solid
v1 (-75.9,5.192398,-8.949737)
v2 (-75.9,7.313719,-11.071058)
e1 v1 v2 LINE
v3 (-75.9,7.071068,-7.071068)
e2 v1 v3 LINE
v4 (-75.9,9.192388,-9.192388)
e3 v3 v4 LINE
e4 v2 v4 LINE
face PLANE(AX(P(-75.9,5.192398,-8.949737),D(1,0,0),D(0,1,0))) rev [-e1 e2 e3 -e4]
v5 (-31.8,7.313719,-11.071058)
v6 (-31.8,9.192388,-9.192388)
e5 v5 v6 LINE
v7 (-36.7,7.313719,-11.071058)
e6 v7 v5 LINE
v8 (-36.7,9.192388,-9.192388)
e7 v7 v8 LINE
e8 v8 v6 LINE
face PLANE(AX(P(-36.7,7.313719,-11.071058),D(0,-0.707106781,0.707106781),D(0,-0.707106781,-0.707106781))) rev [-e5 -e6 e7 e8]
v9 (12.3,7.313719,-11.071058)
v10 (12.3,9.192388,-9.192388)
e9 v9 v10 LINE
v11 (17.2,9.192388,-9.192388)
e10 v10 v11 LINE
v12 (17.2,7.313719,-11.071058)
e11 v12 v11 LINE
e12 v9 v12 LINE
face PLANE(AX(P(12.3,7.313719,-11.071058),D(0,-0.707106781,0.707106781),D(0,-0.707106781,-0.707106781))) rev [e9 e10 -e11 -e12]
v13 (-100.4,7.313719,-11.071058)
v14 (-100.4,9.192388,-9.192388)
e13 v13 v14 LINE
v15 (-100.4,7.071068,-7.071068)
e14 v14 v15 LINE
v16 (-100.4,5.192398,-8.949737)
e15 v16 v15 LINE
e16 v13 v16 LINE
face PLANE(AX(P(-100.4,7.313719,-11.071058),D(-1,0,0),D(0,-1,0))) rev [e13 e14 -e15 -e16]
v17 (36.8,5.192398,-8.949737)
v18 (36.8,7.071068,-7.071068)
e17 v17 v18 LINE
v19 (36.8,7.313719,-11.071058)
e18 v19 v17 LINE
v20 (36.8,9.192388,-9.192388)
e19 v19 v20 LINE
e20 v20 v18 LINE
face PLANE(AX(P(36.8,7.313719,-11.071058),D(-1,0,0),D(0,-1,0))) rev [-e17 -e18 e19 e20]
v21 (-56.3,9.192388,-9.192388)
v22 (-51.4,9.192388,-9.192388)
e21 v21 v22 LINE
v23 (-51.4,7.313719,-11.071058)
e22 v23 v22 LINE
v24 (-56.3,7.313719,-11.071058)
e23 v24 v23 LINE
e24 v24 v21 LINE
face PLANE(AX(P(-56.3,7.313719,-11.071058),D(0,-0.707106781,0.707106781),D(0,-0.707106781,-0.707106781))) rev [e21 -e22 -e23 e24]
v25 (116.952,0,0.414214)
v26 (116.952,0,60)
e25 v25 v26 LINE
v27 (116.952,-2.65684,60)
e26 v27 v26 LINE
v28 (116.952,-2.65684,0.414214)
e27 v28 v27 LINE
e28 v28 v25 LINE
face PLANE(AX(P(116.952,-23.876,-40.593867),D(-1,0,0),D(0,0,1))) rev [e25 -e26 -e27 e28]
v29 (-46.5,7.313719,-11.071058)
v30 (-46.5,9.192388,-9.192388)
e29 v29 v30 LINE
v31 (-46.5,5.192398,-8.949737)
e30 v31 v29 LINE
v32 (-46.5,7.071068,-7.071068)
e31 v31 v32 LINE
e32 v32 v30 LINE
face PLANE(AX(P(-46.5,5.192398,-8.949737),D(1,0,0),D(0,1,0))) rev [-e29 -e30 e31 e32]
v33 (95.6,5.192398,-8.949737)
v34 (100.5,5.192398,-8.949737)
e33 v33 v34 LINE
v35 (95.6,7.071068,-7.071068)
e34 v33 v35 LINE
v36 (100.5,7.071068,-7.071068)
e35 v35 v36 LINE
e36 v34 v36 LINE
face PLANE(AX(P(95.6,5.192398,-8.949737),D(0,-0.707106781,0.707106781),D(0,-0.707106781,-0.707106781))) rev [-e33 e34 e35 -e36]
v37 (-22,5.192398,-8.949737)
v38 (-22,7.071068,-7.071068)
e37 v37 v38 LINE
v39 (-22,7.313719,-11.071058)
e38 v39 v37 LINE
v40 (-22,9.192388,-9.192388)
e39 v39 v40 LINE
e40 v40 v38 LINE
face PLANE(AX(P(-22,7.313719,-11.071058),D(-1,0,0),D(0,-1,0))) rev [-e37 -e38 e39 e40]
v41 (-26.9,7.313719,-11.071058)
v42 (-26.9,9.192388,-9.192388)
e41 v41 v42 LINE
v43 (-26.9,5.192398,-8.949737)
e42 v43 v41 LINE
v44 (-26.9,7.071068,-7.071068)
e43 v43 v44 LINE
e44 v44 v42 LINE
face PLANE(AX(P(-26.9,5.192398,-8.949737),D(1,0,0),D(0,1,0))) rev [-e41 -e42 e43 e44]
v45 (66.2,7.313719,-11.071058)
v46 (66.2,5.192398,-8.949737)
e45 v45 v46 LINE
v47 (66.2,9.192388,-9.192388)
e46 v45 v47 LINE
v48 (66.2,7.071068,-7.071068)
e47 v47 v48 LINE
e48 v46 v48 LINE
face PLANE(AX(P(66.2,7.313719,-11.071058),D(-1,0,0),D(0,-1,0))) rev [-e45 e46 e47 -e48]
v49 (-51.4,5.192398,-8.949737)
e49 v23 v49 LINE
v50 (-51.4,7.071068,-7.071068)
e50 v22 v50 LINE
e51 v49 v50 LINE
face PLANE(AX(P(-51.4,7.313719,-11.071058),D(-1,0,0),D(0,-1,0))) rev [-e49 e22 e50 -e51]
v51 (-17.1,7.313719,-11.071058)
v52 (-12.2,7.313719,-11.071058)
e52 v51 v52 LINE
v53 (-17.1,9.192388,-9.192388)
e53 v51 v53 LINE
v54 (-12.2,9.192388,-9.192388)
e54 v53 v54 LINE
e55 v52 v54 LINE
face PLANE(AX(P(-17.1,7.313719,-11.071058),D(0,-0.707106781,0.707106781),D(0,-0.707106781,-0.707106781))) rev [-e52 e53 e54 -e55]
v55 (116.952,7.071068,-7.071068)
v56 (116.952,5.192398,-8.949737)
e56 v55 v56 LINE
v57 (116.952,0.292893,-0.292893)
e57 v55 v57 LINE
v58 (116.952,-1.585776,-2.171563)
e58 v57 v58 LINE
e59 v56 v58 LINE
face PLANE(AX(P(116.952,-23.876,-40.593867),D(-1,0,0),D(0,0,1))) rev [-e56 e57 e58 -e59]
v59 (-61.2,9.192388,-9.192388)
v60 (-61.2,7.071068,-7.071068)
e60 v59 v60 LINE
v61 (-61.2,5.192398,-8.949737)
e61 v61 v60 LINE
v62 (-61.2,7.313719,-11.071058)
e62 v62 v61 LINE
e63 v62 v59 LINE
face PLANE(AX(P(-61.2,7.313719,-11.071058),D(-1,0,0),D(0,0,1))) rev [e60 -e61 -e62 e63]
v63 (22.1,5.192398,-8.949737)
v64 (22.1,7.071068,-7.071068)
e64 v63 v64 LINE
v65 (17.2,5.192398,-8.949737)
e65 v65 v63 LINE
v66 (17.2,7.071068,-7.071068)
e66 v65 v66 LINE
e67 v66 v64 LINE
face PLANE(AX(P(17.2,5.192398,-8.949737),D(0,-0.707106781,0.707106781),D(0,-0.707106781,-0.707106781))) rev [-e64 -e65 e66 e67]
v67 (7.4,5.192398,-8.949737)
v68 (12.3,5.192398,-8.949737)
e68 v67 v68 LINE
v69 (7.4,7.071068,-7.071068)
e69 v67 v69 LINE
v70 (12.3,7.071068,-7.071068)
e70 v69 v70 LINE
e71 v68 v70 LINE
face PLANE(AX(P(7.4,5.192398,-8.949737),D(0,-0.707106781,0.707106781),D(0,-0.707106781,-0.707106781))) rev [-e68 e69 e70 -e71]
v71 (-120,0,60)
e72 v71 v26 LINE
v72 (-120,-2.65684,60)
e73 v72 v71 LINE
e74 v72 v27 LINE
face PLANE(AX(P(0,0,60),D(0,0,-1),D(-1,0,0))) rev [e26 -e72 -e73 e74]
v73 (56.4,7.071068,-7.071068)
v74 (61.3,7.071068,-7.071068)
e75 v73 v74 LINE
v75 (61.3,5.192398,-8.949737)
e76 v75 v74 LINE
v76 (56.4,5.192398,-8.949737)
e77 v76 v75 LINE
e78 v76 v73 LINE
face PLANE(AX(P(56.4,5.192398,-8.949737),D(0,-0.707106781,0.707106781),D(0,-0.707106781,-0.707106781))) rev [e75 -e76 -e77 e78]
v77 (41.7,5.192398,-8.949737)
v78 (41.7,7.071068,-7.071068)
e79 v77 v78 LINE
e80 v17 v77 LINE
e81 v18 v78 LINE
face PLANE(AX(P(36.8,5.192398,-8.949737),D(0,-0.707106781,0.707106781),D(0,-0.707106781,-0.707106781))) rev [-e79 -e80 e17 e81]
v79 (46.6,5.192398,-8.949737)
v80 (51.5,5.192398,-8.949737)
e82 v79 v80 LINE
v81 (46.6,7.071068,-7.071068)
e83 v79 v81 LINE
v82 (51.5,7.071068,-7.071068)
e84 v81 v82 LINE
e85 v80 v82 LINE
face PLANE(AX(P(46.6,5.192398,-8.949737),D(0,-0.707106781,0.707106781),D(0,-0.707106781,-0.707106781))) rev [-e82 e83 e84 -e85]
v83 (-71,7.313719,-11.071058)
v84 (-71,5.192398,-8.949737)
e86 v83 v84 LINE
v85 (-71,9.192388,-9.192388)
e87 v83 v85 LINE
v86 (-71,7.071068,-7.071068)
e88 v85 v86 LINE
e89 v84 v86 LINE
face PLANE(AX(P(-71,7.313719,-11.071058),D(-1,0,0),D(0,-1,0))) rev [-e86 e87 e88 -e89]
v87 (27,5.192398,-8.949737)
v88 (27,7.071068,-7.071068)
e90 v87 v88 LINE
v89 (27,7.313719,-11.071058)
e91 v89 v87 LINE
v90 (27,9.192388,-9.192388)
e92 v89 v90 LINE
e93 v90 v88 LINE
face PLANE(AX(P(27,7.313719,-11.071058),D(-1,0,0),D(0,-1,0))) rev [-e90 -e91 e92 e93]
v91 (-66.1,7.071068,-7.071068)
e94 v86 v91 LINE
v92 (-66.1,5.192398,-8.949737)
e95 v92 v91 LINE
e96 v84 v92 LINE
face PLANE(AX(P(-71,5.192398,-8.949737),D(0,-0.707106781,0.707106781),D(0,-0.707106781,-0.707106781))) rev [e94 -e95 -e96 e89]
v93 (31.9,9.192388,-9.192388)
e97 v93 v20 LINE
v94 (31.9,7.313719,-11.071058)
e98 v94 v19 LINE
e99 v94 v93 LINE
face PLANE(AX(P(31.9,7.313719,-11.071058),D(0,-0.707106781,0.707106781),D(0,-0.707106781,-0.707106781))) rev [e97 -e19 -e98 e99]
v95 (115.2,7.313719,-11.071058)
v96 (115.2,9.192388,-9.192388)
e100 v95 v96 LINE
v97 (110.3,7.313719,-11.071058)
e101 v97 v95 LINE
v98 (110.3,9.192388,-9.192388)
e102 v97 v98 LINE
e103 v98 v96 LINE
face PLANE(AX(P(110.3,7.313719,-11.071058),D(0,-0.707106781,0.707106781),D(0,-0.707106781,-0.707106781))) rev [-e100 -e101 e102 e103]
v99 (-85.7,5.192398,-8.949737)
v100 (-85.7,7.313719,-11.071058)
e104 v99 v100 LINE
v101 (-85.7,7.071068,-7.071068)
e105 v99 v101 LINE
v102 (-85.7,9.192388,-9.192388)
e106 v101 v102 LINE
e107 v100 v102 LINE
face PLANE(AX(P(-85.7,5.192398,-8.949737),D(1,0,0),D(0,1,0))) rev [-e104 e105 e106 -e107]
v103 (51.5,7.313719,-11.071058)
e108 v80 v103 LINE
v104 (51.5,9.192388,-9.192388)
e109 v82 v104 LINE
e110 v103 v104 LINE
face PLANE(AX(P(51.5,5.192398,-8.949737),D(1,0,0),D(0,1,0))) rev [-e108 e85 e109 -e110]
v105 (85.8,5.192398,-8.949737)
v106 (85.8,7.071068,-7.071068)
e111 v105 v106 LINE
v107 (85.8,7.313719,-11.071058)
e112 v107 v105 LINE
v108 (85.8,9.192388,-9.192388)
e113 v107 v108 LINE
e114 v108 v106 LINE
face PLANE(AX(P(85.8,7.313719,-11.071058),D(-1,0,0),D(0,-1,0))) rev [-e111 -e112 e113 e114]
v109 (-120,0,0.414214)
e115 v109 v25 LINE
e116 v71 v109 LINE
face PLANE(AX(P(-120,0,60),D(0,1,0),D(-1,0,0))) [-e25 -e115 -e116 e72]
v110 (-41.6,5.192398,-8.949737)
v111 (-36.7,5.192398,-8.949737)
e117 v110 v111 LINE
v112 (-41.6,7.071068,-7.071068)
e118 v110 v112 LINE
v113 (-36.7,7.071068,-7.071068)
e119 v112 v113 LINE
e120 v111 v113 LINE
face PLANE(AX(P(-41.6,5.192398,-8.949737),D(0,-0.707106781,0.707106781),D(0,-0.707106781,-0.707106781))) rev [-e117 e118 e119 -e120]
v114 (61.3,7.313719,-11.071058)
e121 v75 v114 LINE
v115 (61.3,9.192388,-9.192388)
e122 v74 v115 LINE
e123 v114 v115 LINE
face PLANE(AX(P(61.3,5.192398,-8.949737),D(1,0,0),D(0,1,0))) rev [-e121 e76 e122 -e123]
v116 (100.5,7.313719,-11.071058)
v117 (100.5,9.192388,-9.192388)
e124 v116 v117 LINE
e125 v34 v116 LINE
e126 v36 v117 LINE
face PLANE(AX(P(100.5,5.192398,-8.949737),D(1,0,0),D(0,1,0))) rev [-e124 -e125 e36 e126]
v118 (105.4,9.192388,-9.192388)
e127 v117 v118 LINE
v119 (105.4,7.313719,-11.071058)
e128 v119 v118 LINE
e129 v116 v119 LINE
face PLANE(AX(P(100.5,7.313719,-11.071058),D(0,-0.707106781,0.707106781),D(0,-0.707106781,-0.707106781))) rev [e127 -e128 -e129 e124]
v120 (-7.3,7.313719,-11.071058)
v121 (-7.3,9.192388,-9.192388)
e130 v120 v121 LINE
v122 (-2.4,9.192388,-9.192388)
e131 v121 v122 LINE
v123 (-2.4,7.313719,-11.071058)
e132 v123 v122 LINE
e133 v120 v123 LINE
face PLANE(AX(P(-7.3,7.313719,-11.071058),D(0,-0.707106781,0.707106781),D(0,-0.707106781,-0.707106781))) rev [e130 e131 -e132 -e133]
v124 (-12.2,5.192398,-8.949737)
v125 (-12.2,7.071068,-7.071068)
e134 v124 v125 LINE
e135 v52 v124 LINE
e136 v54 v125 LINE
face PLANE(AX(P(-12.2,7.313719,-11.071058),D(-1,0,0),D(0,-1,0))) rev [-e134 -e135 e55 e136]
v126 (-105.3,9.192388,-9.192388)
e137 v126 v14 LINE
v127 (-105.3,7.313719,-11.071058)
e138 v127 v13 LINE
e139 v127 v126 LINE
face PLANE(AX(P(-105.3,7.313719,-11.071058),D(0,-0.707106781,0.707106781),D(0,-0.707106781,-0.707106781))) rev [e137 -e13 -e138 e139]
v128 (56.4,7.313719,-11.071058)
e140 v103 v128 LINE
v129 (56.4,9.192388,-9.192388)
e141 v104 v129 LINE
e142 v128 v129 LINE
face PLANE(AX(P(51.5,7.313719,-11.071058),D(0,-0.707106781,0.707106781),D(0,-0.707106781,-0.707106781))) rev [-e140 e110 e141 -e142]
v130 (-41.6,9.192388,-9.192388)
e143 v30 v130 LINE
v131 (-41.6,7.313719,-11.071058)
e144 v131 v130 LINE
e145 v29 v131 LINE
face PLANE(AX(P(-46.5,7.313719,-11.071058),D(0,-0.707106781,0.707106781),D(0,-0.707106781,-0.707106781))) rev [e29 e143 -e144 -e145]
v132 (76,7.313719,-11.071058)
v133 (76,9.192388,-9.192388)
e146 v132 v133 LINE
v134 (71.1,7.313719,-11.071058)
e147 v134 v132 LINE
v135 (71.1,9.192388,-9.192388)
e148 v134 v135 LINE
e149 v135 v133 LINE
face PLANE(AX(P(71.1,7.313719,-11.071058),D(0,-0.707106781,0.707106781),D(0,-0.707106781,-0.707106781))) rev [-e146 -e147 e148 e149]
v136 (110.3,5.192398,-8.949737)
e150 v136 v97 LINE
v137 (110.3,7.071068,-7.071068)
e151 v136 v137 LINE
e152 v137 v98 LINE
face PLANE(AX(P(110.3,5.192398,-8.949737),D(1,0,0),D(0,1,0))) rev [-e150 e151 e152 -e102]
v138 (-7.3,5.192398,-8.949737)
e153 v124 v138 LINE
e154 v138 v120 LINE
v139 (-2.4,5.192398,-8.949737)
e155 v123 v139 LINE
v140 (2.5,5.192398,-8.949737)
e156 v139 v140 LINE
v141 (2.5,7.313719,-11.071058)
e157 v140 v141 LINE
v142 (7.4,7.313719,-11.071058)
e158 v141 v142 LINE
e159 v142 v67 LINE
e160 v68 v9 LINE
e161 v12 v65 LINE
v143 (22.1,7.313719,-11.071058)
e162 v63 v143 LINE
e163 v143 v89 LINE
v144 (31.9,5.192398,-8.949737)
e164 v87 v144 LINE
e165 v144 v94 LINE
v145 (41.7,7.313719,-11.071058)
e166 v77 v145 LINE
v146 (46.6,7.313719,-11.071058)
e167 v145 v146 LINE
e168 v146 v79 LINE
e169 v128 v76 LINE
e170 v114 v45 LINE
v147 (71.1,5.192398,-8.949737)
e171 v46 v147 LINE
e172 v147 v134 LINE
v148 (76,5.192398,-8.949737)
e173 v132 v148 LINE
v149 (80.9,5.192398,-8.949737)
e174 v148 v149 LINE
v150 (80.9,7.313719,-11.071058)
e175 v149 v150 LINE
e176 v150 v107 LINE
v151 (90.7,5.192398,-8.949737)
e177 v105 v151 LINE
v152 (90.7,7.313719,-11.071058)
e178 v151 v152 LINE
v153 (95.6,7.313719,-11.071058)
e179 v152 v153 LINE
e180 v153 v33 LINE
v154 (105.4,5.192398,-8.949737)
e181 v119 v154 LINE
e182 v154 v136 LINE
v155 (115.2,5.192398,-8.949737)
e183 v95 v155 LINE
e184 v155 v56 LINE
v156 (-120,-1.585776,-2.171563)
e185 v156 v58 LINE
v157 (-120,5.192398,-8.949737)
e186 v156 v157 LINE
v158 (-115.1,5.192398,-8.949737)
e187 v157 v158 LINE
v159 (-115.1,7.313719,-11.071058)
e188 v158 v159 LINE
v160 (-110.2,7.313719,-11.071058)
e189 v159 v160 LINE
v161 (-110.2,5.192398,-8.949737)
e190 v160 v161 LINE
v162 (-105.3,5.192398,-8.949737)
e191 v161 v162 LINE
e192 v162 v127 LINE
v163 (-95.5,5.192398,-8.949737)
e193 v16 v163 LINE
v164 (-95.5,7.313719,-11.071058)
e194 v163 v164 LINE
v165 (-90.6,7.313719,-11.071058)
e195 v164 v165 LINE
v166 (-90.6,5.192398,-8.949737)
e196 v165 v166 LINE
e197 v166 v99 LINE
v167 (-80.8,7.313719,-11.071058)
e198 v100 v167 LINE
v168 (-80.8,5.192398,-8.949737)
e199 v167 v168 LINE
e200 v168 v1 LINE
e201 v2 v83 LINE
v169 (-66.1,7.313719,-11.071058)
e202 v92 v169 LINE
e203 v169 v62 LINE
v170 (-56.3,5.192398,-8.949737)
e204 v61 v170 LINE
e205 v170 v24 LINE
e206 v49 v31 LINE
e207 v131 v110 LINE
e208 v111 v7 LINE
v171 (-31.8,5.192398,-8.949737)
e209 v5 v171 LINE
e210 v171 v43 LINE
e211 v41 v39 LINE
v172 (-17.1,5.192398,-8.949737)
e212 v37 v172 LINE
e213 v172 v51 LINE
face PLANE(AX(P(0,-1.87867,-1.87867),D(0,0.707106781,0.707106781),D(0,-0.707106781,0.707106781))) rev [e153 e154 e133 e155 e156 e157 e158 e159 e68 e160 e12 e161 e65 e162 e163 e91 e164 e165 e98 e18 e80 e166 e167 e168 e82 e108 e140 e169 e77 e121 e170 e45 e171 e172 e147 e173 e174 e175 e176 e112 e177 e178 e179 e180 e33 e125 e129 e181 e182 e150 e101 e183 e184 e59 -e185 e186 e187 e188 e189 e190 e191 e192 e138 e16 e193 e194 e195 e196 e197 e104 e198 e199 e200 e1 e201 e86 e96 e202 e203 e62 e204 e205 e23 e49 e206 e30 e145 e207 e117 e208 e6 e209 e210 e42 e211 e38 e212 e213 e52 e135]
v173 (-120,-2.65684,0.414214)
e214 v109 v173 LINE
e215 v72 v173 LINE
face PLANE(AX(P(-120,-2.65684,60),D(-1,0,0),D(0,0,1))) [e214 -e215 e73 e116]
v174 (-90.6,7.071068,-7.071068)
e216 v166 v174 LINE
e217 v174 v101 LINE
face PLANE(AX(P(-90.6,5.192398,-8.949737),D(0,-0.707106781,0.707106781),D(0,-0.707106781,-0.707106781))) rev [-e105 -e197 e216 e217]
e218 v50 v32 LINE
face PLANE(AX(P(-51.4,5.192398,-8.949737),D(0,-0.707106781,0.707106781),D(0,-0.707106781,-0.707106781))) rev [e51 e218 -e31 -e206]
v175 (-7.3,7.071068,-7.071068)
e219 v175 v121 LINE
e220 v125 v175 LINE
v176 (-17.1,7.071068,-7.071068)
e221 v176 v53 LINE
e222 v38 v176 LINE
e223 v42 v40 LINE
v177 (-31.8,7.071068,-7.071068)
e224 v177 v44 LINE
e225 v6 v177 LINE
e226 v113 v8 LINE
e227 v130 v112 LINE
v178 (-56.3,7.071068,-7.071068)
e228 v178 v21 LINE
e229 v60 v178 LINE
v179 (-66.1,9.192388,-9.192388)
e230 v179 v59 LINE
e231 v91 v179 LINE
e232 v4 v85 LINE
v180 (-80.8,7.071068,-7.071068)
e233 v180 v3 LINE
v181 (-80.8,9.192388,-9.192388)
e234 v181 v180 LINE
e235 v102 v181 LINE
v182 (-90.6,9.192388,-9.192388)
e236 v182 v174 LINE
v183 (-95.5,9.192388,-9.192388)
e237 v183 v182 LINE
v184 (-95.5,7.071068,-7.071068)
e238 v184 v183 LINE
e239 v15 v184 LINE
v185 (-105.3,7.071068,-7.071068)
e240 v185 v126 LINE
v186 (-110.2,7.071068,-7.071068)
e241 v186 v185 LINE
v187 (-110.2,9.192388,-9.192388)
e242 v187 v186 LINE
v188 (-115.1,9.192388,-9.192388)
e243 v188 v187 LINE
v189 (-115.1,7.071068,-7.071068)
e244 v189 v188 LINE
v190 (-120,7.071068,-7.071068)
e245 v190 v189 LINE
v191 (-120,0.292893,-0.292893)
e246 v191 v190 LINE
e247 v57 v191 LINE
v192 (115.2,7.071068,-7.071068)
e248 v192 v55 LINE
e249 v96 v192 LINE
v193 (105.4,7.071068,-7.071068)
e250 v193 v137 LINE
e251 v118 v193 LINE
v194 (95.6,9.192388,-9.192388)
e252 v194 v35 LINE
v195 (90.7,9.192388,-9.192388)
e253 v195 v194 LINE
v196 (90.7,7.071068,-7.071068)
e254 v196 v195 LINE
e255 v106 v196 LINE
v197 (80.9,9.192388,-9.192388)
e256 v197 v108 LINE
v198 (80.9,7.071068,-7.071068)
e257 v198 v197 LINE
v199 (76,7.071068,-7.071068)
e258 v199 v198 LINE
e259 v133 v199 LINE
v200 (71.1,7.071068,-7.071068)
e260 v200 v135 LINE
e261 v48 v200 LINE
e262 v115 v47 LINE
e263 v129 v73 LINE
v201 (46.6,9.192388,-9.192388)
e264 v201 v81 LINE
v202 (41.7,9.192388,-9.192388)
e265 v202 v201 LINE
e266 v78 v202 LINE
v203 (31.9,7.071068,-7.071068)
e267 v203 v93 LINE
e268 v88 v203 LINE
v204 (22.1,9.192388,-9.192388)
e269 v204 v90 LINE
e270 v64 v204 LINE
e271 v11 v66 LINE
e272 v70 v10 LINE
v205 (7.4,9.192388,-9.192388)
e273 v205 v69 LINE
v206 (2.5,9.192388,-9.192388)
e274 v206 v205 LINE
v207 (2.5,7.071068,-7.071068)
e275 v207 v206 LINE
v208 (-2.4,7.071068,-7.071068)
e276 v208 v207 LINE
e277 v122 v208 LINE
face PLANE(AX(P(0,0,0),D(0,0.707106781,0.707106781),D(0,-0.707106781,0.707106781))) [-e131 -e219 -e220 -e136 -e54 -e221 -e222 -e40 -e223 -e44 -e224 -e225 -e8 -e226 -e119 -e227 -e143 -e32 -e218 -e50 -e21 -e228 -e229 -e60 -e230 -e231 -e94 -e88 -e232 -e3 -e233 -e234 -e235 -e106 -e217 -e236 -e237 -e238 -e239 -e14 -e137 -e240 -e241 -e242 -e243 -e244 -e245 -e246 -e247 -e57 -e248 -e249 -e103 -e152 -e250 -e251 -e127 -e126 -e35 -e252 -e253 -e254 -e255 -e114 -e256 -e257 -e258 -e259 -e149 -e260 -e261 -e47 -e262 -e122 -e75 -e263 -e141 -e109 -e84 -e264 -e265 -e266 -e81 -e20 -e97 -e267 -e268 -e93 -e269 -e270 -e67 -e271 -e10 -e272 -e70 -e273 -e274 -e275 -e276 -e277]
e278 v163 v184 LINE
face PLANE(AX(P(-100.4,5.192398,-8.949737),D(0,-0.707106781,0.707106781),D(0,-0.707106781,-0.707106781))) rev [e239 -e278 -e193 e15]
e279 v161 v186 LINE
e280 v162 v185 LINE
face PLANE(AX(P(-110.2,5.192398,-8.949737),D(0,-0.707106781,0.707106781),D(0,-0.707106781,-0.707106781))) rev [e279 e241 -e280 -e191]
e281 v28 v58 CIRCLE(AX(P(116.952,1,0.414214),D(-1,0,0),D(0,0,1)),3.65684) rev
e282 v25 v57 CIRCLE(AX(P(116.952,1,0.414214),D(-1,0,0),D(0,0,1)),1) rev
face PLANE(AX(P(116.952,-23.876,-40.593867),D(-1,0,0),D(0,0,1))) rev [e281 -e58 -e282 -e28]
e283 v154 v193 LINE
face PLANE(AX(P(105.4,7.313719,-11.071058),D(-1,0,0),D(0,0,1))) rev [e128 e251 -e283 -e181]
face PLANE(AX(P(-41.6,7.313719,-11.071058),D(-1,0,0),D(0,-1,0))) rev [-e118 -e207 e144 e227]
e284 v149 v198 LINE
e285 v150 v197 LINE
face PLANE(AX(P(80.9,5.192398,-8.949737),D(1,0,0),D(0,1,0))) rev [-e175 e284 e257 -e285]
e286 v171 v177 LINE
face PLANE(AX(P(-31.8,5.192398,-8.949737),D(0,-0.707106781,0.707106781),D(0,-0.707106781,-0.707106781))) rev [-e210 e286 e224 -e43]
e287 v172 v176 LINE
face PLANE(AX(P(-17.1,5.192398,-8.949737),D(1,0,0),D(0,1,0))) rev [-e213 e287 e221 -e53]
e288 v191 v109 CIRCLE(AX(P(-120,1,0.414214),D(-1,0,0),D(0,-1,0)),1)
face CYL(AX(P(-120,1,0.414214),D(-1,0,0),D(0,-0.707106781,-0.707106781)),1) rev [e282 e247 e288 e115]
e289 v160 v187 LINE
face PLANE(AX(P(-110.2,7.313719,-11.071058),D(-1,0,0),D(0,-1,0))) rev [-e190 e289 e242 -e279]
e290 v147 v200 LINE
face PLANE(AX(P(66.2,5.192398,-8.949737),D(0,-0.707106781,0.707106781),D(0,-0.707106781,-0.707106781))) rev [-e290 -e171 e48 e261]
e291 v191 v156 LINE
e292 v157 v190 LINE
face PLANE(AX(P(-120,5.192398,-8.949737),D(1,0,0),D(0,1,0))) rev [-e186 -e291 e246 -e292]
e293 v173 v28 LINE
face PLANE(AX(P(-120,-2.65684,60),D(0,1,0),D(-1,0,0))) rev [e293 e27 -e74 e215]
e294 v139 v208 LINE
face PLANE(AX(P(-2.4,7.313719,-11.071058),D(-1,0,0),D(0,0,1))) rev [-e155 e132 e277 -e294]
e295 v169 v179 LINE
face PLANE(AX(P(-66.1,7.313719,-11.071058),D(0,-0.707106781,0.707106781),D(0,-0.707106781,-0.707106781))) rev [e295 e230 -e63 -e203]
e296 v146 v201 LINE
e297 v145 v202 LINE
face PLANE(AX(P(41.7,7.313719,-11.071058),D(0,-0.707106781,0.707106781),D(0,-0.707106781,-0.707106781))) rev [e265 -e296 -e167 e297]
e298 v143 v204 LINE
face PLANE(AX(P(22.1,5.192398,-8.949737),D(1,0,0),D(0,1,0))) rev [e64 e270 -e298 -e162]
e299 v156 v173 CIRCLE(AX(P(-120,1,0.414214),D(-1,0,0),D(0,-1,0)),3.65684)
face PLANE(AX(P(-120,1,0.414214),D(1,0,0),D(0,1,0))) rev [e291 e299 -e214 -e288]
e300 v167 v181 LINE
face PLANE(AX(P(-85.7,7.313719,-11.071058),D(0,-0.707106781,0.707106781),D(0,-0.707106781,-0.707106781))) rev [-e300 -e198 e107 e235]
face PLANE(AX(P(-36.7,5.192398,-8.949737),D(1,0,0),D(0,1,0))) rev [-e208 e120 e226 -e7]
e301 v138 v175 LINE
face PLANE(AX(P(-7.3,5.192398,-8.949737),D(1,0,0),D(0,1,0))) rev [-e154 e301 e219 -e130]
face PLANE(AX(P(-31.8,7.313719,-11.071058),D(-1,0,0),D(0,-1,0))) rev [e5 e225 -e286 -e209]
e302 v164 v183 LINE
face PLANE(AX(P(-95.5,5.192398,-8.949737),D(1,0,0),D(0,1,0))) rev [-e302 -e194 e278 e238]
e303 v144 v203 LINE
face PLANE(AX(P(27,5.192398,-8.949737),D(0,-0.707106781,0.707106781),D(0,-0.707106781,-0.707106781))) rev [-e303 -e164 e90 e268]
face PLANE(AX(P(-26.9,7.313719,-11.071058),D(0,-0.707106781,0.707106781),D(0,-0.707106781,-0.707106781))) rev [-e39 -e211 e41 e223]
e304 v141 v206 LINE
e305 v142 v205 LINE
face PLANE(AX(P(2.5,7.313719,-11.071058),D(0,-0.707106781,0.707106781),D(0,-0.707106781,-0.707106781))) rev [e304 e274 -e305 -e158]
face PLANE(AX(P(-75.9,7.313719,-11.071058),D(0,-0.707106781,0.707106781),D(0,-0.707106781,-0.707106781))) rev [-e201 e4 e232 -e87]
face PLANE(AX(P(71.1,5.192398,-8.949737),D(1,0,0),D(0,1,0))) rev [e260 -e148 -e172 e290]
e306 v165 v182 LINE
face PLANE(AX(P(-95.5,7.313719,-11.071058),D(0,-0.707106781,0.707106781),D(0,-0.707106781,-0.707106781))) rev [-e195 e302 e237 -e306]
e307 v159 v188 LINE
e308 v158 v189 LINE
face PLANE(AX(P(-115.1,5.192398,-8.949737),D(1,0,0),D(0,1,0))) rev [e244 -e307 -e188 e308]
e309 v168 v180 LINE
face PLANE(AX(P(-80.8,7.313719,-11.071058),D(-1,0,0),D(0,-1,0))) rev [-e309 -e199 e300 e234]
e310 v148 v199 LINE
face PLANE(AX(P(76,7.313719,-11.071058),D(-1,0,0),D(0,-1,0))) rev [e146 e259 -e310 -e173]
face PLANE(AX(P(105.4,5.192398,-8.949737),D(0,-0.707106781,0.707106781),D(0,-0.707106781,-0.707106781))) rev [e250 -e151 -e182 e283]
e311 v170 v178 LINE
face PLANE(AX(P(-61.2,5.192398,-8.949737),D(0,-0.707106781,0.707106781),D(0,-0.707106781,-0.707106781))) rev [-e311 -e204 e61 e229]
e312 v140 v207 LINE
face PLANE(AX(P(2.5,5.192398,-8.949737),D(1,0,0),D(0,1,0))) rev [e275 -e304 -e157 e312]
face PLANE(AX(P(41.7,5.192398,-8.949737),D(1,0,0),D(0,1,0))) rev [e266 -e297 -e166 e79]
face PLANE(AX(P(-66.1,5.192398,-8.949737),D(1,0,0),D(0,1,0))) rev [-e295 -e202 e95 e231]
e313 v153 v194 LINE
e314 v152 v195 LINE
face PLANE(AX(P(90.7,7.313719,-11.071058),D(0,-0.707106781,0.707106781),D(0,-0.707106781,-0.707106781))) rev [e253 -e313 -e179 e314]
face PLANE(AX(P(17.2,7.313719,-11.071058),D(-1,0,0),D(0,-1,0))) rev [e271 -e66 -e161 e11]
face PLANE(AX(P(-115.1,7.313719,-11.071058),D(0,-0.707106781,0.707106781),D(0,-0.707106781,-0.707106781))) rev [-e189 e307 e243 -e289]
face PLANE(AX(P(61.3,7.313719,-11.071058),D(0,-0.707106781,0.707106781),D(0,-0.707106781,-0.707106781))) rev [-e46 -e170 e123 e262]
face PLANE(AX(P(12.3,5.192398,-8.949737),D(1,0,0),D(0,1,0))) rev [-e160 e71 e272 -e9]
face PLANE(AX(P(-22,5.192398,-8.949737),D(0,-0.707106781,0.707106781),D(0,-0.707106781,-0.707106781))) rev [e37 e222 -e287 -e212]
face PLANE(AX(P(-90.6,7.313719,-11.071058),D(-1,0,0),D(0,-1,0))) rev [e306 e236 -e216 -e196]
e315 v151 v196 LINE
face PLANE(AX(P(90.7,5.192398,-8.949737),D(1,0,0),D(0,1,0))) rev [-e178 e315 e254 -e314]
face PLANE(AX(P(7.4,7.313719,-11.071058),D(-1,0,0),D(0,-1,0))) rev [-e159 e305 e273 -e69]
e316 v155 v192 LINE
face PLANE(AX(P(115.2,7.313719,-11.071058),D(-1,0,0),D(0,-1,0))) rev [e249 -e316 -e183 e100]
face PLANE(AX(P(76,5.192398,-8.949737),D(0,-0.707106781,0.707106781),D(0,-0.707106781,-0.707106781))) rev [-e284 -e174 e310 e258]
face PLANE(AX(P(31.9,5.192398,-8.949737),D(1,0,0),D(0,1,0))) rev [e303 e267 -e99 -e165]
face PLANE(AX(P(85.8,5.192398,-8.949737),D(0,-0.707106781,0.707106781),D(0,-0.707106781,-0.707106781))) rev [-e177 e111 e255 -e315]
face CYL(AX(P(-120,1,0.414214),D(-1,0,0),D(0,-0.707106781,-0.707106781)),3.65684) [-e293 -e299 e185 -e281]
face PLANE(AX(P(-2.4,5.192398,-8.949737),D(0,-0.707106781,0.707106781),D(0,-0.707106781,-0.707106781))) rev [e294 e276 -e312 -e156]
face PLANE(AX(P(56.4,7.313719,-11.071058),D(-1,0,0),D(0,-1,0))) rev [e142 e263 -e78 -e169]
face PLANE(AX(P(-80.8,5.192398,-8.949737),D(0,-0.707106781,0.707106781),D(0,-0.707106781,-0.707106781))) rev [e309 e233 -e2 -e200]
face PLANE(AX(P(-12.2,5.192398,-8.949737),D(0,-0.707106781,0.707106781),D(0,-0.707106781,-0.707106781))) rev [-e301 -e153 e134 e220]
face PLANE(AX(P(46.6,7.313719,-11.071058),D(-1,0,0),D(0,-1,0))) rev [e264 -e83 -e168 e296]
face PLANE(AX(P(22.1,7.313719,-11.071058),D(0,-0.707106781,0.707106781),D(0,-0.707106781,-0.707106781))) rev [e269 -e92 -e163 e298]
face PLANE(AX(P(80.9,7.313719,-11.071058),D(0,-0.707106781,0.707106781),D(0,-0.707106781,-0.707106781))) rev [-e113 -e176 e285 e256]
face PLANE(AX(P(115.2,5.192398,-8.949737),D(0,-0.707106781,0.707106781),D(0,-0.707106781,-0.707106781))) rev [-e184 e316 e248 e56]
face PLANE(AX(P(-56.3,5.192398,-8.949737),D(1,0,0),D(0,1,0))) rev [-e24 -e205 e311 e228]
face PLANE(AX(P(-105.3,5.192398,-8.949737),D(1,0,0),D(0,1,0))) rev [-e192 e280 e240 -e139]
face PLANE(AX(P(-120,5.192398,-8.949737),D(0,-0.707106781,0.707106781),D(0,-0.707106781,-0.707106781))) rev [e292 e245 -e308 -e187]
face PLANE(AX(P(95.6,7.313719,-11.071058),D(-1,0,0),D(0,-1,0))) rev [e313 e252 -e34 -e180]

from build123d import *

# Parameters (mm, degrees)
SKETCH1_W                    = 240
SKETCH1_H                    = 2.65684
BASE_FLANGE1_DEPTH           = 60
EDGE_FLANGE1_STRIP_CUT_DEPTH = 240
EDGE_FLANGE1_DEPTH           = 240
EDGE_FLANGE1_START           = 2.65684
EDGE_FLANGE1_FLAT_DEPTH      = 2.65684
CUT_EXTRUDE1_DEPTH           = 33.782
CUT_EXTRUDE1_DEPTH_BACK      = 23.876


# Sheet-metal steps are written as plain solids
with BuildPart() as part:
    # Sketch1 → Base-Flange1 (new body)
    with BuildSketch(Plane.XY):
        with Locations((0, -1.32842)):
            Rectangle(SKETCH1_W, SKETCH1_H)
    extrude(amount=BASE_FLANGE1_DEPTH)

    # Edge-Flange1 strip (across the edge) → Edge-Flange1 strip cut (cut)
    with BuildSketch(Plane(origin=(120, 0, 0), x_dir=(0, 0.7071067811865512, 0.7071067811865438), z_dir=(-1, 0, 0))):
        Polygon((-10.514668246, 6.757329085), (-1.585776362, -2.171562799), (0.292893219, -0.292893219), (-8.635998666, 8.635998666), align=None)
    extrude(amount=EDGE_FLANGE1_STRIP_CUT_DEPTH, mode=Mode.SUBTRACT)

    # Edge-Flange1 bend section (across the edge) → Edge-Flange1 (add)
    with BuildSketch(Plane(origin=(120, 0, 0), x_dir=(0, 0.7071067811865512, 0.7071067811865438), z_dir=(-1, 0, 0))):
        with BuildLine():
            Line((-2.65684, 0.414213562), (0, 0.414213562))
            ThreePointArc((0, 0.414213562), (0.076120467, 0.03153013), (0.292893219, -0.292893219))
            Line((0.292893219, -0.292893219), (-1.585776362, -2.171562799))
            ThreePointArc((-1.585776362, -2.171562799), (-2.37847963, -0.98519852), (-2.65684, 0.414213562))
        make_face()
    extrude(amount=EDGE_FLANGE1_DEPTH)

    # Edge-Flange1 profile (on flange) → Edge-Flange1 flat (add)
    with BuildSketch(Plane(origin=(0, 0, 0), x_dir=(-1, 0, 0), z_dir=(0, -0.7071067811865512, -0.7071067811865438)).offset(EDGE_FLANGE1_START)):
        Polygon((120, 0.414213562), (120, 10), (115.1, 10), (115.1, 13), (110.2, 13), (110.2, 10), (105.3, 10), (105.3, 13), (100.4, 13), (100.4, 10), (95.5, 10), (95.5, 13), (90.6, 13), (90.6, 10), (85.7, 10), (85.7, 13), (80.8, 13), (80.8, 10), (75.9, 10), (75.9, 13), (71, 13), (71, 10), (66.1, 10), (66.1, 13), (61.2, 13), (61.2, 10), (56.3, 10), (56.3, 13), (51.4, 13), (51.4, 10), (46.5, 10), (46.5, 13), (41.6, 13), (41.6, 10), (36.7, 10), (36.7, 13), (31.8, 13), (31.8, 10), (26.9, 10), (26.9, 13), (22, 13), (22, 10), (17.1, 10), (17.1, 13), (12.2, 13), (12.2, 10), (7.3, 10), (7.3, 13), (2.4, 13), (2.4, 10), (-2.5, 10), (-2.5, 13), (-7.4, 13), (-7.4, 10), (-12.3, 10), (-12.3, 13), (-17.2, 13), (-17.2, 10), (-22.1, 10), (-22.1, 13), (-27, 13), (-27, 10), (-31.9, 10), (-31.9, 13), (-36.8, 13), (-36.8, 10), (-41.7, 10), (-41.7, 13), (-46.6, 13), (-46.6, 10), (-51.5, 10), (-51.5, 13), (-56.4, 13), (-56.4, 10), (-61.3, 10), (-61.3, 13), (-66.2, 13), (-66.2, 10), (-71.1, 10), (-71.1, 13), (-76, 13), (-76, 10), (-80.9, 10), (-80.9, 13), (-85.8, 13), (-85.8, 10), (-90.7, 10), (-90.7, 13), (-95.6, 13), (-95.6, 10), (-100.5, 10), (-100.5, 13), (-105.4, 13), (-105.4, 10), (-110.3, 10), (-110.3, 13), (-115.2, 13), (-115.2, 10), (-120, 10), (-120, 0.414213562), align=None)
    extrude(amount=-EDGE_FLANGE1_FLAT_DEPTH)

    # Sketch9 → Cut-Extrude1 (cut, two sides: drawn at the far end of the back side and taken through both)
    with BuildSketch(Plane(origin=(0, 0, 0), x_dir=(1, 0, 0), z_dir=(0, 1, 0)).offset(-CUT_EXTRUDE1_DEPTH_BACK)):
        Polygon((120, -60), (120, 40.593867323), (116.952, 40.593867323), (116.952, -75.248845782), (120, -75.248845782), align=None)
    extrude(amount=CUT_EXTRUDE1_DEPTH + CUT_EXTRUDE1_DEPTH_BACK, mode=Mode.SUBTRACT)


solid = part.part
